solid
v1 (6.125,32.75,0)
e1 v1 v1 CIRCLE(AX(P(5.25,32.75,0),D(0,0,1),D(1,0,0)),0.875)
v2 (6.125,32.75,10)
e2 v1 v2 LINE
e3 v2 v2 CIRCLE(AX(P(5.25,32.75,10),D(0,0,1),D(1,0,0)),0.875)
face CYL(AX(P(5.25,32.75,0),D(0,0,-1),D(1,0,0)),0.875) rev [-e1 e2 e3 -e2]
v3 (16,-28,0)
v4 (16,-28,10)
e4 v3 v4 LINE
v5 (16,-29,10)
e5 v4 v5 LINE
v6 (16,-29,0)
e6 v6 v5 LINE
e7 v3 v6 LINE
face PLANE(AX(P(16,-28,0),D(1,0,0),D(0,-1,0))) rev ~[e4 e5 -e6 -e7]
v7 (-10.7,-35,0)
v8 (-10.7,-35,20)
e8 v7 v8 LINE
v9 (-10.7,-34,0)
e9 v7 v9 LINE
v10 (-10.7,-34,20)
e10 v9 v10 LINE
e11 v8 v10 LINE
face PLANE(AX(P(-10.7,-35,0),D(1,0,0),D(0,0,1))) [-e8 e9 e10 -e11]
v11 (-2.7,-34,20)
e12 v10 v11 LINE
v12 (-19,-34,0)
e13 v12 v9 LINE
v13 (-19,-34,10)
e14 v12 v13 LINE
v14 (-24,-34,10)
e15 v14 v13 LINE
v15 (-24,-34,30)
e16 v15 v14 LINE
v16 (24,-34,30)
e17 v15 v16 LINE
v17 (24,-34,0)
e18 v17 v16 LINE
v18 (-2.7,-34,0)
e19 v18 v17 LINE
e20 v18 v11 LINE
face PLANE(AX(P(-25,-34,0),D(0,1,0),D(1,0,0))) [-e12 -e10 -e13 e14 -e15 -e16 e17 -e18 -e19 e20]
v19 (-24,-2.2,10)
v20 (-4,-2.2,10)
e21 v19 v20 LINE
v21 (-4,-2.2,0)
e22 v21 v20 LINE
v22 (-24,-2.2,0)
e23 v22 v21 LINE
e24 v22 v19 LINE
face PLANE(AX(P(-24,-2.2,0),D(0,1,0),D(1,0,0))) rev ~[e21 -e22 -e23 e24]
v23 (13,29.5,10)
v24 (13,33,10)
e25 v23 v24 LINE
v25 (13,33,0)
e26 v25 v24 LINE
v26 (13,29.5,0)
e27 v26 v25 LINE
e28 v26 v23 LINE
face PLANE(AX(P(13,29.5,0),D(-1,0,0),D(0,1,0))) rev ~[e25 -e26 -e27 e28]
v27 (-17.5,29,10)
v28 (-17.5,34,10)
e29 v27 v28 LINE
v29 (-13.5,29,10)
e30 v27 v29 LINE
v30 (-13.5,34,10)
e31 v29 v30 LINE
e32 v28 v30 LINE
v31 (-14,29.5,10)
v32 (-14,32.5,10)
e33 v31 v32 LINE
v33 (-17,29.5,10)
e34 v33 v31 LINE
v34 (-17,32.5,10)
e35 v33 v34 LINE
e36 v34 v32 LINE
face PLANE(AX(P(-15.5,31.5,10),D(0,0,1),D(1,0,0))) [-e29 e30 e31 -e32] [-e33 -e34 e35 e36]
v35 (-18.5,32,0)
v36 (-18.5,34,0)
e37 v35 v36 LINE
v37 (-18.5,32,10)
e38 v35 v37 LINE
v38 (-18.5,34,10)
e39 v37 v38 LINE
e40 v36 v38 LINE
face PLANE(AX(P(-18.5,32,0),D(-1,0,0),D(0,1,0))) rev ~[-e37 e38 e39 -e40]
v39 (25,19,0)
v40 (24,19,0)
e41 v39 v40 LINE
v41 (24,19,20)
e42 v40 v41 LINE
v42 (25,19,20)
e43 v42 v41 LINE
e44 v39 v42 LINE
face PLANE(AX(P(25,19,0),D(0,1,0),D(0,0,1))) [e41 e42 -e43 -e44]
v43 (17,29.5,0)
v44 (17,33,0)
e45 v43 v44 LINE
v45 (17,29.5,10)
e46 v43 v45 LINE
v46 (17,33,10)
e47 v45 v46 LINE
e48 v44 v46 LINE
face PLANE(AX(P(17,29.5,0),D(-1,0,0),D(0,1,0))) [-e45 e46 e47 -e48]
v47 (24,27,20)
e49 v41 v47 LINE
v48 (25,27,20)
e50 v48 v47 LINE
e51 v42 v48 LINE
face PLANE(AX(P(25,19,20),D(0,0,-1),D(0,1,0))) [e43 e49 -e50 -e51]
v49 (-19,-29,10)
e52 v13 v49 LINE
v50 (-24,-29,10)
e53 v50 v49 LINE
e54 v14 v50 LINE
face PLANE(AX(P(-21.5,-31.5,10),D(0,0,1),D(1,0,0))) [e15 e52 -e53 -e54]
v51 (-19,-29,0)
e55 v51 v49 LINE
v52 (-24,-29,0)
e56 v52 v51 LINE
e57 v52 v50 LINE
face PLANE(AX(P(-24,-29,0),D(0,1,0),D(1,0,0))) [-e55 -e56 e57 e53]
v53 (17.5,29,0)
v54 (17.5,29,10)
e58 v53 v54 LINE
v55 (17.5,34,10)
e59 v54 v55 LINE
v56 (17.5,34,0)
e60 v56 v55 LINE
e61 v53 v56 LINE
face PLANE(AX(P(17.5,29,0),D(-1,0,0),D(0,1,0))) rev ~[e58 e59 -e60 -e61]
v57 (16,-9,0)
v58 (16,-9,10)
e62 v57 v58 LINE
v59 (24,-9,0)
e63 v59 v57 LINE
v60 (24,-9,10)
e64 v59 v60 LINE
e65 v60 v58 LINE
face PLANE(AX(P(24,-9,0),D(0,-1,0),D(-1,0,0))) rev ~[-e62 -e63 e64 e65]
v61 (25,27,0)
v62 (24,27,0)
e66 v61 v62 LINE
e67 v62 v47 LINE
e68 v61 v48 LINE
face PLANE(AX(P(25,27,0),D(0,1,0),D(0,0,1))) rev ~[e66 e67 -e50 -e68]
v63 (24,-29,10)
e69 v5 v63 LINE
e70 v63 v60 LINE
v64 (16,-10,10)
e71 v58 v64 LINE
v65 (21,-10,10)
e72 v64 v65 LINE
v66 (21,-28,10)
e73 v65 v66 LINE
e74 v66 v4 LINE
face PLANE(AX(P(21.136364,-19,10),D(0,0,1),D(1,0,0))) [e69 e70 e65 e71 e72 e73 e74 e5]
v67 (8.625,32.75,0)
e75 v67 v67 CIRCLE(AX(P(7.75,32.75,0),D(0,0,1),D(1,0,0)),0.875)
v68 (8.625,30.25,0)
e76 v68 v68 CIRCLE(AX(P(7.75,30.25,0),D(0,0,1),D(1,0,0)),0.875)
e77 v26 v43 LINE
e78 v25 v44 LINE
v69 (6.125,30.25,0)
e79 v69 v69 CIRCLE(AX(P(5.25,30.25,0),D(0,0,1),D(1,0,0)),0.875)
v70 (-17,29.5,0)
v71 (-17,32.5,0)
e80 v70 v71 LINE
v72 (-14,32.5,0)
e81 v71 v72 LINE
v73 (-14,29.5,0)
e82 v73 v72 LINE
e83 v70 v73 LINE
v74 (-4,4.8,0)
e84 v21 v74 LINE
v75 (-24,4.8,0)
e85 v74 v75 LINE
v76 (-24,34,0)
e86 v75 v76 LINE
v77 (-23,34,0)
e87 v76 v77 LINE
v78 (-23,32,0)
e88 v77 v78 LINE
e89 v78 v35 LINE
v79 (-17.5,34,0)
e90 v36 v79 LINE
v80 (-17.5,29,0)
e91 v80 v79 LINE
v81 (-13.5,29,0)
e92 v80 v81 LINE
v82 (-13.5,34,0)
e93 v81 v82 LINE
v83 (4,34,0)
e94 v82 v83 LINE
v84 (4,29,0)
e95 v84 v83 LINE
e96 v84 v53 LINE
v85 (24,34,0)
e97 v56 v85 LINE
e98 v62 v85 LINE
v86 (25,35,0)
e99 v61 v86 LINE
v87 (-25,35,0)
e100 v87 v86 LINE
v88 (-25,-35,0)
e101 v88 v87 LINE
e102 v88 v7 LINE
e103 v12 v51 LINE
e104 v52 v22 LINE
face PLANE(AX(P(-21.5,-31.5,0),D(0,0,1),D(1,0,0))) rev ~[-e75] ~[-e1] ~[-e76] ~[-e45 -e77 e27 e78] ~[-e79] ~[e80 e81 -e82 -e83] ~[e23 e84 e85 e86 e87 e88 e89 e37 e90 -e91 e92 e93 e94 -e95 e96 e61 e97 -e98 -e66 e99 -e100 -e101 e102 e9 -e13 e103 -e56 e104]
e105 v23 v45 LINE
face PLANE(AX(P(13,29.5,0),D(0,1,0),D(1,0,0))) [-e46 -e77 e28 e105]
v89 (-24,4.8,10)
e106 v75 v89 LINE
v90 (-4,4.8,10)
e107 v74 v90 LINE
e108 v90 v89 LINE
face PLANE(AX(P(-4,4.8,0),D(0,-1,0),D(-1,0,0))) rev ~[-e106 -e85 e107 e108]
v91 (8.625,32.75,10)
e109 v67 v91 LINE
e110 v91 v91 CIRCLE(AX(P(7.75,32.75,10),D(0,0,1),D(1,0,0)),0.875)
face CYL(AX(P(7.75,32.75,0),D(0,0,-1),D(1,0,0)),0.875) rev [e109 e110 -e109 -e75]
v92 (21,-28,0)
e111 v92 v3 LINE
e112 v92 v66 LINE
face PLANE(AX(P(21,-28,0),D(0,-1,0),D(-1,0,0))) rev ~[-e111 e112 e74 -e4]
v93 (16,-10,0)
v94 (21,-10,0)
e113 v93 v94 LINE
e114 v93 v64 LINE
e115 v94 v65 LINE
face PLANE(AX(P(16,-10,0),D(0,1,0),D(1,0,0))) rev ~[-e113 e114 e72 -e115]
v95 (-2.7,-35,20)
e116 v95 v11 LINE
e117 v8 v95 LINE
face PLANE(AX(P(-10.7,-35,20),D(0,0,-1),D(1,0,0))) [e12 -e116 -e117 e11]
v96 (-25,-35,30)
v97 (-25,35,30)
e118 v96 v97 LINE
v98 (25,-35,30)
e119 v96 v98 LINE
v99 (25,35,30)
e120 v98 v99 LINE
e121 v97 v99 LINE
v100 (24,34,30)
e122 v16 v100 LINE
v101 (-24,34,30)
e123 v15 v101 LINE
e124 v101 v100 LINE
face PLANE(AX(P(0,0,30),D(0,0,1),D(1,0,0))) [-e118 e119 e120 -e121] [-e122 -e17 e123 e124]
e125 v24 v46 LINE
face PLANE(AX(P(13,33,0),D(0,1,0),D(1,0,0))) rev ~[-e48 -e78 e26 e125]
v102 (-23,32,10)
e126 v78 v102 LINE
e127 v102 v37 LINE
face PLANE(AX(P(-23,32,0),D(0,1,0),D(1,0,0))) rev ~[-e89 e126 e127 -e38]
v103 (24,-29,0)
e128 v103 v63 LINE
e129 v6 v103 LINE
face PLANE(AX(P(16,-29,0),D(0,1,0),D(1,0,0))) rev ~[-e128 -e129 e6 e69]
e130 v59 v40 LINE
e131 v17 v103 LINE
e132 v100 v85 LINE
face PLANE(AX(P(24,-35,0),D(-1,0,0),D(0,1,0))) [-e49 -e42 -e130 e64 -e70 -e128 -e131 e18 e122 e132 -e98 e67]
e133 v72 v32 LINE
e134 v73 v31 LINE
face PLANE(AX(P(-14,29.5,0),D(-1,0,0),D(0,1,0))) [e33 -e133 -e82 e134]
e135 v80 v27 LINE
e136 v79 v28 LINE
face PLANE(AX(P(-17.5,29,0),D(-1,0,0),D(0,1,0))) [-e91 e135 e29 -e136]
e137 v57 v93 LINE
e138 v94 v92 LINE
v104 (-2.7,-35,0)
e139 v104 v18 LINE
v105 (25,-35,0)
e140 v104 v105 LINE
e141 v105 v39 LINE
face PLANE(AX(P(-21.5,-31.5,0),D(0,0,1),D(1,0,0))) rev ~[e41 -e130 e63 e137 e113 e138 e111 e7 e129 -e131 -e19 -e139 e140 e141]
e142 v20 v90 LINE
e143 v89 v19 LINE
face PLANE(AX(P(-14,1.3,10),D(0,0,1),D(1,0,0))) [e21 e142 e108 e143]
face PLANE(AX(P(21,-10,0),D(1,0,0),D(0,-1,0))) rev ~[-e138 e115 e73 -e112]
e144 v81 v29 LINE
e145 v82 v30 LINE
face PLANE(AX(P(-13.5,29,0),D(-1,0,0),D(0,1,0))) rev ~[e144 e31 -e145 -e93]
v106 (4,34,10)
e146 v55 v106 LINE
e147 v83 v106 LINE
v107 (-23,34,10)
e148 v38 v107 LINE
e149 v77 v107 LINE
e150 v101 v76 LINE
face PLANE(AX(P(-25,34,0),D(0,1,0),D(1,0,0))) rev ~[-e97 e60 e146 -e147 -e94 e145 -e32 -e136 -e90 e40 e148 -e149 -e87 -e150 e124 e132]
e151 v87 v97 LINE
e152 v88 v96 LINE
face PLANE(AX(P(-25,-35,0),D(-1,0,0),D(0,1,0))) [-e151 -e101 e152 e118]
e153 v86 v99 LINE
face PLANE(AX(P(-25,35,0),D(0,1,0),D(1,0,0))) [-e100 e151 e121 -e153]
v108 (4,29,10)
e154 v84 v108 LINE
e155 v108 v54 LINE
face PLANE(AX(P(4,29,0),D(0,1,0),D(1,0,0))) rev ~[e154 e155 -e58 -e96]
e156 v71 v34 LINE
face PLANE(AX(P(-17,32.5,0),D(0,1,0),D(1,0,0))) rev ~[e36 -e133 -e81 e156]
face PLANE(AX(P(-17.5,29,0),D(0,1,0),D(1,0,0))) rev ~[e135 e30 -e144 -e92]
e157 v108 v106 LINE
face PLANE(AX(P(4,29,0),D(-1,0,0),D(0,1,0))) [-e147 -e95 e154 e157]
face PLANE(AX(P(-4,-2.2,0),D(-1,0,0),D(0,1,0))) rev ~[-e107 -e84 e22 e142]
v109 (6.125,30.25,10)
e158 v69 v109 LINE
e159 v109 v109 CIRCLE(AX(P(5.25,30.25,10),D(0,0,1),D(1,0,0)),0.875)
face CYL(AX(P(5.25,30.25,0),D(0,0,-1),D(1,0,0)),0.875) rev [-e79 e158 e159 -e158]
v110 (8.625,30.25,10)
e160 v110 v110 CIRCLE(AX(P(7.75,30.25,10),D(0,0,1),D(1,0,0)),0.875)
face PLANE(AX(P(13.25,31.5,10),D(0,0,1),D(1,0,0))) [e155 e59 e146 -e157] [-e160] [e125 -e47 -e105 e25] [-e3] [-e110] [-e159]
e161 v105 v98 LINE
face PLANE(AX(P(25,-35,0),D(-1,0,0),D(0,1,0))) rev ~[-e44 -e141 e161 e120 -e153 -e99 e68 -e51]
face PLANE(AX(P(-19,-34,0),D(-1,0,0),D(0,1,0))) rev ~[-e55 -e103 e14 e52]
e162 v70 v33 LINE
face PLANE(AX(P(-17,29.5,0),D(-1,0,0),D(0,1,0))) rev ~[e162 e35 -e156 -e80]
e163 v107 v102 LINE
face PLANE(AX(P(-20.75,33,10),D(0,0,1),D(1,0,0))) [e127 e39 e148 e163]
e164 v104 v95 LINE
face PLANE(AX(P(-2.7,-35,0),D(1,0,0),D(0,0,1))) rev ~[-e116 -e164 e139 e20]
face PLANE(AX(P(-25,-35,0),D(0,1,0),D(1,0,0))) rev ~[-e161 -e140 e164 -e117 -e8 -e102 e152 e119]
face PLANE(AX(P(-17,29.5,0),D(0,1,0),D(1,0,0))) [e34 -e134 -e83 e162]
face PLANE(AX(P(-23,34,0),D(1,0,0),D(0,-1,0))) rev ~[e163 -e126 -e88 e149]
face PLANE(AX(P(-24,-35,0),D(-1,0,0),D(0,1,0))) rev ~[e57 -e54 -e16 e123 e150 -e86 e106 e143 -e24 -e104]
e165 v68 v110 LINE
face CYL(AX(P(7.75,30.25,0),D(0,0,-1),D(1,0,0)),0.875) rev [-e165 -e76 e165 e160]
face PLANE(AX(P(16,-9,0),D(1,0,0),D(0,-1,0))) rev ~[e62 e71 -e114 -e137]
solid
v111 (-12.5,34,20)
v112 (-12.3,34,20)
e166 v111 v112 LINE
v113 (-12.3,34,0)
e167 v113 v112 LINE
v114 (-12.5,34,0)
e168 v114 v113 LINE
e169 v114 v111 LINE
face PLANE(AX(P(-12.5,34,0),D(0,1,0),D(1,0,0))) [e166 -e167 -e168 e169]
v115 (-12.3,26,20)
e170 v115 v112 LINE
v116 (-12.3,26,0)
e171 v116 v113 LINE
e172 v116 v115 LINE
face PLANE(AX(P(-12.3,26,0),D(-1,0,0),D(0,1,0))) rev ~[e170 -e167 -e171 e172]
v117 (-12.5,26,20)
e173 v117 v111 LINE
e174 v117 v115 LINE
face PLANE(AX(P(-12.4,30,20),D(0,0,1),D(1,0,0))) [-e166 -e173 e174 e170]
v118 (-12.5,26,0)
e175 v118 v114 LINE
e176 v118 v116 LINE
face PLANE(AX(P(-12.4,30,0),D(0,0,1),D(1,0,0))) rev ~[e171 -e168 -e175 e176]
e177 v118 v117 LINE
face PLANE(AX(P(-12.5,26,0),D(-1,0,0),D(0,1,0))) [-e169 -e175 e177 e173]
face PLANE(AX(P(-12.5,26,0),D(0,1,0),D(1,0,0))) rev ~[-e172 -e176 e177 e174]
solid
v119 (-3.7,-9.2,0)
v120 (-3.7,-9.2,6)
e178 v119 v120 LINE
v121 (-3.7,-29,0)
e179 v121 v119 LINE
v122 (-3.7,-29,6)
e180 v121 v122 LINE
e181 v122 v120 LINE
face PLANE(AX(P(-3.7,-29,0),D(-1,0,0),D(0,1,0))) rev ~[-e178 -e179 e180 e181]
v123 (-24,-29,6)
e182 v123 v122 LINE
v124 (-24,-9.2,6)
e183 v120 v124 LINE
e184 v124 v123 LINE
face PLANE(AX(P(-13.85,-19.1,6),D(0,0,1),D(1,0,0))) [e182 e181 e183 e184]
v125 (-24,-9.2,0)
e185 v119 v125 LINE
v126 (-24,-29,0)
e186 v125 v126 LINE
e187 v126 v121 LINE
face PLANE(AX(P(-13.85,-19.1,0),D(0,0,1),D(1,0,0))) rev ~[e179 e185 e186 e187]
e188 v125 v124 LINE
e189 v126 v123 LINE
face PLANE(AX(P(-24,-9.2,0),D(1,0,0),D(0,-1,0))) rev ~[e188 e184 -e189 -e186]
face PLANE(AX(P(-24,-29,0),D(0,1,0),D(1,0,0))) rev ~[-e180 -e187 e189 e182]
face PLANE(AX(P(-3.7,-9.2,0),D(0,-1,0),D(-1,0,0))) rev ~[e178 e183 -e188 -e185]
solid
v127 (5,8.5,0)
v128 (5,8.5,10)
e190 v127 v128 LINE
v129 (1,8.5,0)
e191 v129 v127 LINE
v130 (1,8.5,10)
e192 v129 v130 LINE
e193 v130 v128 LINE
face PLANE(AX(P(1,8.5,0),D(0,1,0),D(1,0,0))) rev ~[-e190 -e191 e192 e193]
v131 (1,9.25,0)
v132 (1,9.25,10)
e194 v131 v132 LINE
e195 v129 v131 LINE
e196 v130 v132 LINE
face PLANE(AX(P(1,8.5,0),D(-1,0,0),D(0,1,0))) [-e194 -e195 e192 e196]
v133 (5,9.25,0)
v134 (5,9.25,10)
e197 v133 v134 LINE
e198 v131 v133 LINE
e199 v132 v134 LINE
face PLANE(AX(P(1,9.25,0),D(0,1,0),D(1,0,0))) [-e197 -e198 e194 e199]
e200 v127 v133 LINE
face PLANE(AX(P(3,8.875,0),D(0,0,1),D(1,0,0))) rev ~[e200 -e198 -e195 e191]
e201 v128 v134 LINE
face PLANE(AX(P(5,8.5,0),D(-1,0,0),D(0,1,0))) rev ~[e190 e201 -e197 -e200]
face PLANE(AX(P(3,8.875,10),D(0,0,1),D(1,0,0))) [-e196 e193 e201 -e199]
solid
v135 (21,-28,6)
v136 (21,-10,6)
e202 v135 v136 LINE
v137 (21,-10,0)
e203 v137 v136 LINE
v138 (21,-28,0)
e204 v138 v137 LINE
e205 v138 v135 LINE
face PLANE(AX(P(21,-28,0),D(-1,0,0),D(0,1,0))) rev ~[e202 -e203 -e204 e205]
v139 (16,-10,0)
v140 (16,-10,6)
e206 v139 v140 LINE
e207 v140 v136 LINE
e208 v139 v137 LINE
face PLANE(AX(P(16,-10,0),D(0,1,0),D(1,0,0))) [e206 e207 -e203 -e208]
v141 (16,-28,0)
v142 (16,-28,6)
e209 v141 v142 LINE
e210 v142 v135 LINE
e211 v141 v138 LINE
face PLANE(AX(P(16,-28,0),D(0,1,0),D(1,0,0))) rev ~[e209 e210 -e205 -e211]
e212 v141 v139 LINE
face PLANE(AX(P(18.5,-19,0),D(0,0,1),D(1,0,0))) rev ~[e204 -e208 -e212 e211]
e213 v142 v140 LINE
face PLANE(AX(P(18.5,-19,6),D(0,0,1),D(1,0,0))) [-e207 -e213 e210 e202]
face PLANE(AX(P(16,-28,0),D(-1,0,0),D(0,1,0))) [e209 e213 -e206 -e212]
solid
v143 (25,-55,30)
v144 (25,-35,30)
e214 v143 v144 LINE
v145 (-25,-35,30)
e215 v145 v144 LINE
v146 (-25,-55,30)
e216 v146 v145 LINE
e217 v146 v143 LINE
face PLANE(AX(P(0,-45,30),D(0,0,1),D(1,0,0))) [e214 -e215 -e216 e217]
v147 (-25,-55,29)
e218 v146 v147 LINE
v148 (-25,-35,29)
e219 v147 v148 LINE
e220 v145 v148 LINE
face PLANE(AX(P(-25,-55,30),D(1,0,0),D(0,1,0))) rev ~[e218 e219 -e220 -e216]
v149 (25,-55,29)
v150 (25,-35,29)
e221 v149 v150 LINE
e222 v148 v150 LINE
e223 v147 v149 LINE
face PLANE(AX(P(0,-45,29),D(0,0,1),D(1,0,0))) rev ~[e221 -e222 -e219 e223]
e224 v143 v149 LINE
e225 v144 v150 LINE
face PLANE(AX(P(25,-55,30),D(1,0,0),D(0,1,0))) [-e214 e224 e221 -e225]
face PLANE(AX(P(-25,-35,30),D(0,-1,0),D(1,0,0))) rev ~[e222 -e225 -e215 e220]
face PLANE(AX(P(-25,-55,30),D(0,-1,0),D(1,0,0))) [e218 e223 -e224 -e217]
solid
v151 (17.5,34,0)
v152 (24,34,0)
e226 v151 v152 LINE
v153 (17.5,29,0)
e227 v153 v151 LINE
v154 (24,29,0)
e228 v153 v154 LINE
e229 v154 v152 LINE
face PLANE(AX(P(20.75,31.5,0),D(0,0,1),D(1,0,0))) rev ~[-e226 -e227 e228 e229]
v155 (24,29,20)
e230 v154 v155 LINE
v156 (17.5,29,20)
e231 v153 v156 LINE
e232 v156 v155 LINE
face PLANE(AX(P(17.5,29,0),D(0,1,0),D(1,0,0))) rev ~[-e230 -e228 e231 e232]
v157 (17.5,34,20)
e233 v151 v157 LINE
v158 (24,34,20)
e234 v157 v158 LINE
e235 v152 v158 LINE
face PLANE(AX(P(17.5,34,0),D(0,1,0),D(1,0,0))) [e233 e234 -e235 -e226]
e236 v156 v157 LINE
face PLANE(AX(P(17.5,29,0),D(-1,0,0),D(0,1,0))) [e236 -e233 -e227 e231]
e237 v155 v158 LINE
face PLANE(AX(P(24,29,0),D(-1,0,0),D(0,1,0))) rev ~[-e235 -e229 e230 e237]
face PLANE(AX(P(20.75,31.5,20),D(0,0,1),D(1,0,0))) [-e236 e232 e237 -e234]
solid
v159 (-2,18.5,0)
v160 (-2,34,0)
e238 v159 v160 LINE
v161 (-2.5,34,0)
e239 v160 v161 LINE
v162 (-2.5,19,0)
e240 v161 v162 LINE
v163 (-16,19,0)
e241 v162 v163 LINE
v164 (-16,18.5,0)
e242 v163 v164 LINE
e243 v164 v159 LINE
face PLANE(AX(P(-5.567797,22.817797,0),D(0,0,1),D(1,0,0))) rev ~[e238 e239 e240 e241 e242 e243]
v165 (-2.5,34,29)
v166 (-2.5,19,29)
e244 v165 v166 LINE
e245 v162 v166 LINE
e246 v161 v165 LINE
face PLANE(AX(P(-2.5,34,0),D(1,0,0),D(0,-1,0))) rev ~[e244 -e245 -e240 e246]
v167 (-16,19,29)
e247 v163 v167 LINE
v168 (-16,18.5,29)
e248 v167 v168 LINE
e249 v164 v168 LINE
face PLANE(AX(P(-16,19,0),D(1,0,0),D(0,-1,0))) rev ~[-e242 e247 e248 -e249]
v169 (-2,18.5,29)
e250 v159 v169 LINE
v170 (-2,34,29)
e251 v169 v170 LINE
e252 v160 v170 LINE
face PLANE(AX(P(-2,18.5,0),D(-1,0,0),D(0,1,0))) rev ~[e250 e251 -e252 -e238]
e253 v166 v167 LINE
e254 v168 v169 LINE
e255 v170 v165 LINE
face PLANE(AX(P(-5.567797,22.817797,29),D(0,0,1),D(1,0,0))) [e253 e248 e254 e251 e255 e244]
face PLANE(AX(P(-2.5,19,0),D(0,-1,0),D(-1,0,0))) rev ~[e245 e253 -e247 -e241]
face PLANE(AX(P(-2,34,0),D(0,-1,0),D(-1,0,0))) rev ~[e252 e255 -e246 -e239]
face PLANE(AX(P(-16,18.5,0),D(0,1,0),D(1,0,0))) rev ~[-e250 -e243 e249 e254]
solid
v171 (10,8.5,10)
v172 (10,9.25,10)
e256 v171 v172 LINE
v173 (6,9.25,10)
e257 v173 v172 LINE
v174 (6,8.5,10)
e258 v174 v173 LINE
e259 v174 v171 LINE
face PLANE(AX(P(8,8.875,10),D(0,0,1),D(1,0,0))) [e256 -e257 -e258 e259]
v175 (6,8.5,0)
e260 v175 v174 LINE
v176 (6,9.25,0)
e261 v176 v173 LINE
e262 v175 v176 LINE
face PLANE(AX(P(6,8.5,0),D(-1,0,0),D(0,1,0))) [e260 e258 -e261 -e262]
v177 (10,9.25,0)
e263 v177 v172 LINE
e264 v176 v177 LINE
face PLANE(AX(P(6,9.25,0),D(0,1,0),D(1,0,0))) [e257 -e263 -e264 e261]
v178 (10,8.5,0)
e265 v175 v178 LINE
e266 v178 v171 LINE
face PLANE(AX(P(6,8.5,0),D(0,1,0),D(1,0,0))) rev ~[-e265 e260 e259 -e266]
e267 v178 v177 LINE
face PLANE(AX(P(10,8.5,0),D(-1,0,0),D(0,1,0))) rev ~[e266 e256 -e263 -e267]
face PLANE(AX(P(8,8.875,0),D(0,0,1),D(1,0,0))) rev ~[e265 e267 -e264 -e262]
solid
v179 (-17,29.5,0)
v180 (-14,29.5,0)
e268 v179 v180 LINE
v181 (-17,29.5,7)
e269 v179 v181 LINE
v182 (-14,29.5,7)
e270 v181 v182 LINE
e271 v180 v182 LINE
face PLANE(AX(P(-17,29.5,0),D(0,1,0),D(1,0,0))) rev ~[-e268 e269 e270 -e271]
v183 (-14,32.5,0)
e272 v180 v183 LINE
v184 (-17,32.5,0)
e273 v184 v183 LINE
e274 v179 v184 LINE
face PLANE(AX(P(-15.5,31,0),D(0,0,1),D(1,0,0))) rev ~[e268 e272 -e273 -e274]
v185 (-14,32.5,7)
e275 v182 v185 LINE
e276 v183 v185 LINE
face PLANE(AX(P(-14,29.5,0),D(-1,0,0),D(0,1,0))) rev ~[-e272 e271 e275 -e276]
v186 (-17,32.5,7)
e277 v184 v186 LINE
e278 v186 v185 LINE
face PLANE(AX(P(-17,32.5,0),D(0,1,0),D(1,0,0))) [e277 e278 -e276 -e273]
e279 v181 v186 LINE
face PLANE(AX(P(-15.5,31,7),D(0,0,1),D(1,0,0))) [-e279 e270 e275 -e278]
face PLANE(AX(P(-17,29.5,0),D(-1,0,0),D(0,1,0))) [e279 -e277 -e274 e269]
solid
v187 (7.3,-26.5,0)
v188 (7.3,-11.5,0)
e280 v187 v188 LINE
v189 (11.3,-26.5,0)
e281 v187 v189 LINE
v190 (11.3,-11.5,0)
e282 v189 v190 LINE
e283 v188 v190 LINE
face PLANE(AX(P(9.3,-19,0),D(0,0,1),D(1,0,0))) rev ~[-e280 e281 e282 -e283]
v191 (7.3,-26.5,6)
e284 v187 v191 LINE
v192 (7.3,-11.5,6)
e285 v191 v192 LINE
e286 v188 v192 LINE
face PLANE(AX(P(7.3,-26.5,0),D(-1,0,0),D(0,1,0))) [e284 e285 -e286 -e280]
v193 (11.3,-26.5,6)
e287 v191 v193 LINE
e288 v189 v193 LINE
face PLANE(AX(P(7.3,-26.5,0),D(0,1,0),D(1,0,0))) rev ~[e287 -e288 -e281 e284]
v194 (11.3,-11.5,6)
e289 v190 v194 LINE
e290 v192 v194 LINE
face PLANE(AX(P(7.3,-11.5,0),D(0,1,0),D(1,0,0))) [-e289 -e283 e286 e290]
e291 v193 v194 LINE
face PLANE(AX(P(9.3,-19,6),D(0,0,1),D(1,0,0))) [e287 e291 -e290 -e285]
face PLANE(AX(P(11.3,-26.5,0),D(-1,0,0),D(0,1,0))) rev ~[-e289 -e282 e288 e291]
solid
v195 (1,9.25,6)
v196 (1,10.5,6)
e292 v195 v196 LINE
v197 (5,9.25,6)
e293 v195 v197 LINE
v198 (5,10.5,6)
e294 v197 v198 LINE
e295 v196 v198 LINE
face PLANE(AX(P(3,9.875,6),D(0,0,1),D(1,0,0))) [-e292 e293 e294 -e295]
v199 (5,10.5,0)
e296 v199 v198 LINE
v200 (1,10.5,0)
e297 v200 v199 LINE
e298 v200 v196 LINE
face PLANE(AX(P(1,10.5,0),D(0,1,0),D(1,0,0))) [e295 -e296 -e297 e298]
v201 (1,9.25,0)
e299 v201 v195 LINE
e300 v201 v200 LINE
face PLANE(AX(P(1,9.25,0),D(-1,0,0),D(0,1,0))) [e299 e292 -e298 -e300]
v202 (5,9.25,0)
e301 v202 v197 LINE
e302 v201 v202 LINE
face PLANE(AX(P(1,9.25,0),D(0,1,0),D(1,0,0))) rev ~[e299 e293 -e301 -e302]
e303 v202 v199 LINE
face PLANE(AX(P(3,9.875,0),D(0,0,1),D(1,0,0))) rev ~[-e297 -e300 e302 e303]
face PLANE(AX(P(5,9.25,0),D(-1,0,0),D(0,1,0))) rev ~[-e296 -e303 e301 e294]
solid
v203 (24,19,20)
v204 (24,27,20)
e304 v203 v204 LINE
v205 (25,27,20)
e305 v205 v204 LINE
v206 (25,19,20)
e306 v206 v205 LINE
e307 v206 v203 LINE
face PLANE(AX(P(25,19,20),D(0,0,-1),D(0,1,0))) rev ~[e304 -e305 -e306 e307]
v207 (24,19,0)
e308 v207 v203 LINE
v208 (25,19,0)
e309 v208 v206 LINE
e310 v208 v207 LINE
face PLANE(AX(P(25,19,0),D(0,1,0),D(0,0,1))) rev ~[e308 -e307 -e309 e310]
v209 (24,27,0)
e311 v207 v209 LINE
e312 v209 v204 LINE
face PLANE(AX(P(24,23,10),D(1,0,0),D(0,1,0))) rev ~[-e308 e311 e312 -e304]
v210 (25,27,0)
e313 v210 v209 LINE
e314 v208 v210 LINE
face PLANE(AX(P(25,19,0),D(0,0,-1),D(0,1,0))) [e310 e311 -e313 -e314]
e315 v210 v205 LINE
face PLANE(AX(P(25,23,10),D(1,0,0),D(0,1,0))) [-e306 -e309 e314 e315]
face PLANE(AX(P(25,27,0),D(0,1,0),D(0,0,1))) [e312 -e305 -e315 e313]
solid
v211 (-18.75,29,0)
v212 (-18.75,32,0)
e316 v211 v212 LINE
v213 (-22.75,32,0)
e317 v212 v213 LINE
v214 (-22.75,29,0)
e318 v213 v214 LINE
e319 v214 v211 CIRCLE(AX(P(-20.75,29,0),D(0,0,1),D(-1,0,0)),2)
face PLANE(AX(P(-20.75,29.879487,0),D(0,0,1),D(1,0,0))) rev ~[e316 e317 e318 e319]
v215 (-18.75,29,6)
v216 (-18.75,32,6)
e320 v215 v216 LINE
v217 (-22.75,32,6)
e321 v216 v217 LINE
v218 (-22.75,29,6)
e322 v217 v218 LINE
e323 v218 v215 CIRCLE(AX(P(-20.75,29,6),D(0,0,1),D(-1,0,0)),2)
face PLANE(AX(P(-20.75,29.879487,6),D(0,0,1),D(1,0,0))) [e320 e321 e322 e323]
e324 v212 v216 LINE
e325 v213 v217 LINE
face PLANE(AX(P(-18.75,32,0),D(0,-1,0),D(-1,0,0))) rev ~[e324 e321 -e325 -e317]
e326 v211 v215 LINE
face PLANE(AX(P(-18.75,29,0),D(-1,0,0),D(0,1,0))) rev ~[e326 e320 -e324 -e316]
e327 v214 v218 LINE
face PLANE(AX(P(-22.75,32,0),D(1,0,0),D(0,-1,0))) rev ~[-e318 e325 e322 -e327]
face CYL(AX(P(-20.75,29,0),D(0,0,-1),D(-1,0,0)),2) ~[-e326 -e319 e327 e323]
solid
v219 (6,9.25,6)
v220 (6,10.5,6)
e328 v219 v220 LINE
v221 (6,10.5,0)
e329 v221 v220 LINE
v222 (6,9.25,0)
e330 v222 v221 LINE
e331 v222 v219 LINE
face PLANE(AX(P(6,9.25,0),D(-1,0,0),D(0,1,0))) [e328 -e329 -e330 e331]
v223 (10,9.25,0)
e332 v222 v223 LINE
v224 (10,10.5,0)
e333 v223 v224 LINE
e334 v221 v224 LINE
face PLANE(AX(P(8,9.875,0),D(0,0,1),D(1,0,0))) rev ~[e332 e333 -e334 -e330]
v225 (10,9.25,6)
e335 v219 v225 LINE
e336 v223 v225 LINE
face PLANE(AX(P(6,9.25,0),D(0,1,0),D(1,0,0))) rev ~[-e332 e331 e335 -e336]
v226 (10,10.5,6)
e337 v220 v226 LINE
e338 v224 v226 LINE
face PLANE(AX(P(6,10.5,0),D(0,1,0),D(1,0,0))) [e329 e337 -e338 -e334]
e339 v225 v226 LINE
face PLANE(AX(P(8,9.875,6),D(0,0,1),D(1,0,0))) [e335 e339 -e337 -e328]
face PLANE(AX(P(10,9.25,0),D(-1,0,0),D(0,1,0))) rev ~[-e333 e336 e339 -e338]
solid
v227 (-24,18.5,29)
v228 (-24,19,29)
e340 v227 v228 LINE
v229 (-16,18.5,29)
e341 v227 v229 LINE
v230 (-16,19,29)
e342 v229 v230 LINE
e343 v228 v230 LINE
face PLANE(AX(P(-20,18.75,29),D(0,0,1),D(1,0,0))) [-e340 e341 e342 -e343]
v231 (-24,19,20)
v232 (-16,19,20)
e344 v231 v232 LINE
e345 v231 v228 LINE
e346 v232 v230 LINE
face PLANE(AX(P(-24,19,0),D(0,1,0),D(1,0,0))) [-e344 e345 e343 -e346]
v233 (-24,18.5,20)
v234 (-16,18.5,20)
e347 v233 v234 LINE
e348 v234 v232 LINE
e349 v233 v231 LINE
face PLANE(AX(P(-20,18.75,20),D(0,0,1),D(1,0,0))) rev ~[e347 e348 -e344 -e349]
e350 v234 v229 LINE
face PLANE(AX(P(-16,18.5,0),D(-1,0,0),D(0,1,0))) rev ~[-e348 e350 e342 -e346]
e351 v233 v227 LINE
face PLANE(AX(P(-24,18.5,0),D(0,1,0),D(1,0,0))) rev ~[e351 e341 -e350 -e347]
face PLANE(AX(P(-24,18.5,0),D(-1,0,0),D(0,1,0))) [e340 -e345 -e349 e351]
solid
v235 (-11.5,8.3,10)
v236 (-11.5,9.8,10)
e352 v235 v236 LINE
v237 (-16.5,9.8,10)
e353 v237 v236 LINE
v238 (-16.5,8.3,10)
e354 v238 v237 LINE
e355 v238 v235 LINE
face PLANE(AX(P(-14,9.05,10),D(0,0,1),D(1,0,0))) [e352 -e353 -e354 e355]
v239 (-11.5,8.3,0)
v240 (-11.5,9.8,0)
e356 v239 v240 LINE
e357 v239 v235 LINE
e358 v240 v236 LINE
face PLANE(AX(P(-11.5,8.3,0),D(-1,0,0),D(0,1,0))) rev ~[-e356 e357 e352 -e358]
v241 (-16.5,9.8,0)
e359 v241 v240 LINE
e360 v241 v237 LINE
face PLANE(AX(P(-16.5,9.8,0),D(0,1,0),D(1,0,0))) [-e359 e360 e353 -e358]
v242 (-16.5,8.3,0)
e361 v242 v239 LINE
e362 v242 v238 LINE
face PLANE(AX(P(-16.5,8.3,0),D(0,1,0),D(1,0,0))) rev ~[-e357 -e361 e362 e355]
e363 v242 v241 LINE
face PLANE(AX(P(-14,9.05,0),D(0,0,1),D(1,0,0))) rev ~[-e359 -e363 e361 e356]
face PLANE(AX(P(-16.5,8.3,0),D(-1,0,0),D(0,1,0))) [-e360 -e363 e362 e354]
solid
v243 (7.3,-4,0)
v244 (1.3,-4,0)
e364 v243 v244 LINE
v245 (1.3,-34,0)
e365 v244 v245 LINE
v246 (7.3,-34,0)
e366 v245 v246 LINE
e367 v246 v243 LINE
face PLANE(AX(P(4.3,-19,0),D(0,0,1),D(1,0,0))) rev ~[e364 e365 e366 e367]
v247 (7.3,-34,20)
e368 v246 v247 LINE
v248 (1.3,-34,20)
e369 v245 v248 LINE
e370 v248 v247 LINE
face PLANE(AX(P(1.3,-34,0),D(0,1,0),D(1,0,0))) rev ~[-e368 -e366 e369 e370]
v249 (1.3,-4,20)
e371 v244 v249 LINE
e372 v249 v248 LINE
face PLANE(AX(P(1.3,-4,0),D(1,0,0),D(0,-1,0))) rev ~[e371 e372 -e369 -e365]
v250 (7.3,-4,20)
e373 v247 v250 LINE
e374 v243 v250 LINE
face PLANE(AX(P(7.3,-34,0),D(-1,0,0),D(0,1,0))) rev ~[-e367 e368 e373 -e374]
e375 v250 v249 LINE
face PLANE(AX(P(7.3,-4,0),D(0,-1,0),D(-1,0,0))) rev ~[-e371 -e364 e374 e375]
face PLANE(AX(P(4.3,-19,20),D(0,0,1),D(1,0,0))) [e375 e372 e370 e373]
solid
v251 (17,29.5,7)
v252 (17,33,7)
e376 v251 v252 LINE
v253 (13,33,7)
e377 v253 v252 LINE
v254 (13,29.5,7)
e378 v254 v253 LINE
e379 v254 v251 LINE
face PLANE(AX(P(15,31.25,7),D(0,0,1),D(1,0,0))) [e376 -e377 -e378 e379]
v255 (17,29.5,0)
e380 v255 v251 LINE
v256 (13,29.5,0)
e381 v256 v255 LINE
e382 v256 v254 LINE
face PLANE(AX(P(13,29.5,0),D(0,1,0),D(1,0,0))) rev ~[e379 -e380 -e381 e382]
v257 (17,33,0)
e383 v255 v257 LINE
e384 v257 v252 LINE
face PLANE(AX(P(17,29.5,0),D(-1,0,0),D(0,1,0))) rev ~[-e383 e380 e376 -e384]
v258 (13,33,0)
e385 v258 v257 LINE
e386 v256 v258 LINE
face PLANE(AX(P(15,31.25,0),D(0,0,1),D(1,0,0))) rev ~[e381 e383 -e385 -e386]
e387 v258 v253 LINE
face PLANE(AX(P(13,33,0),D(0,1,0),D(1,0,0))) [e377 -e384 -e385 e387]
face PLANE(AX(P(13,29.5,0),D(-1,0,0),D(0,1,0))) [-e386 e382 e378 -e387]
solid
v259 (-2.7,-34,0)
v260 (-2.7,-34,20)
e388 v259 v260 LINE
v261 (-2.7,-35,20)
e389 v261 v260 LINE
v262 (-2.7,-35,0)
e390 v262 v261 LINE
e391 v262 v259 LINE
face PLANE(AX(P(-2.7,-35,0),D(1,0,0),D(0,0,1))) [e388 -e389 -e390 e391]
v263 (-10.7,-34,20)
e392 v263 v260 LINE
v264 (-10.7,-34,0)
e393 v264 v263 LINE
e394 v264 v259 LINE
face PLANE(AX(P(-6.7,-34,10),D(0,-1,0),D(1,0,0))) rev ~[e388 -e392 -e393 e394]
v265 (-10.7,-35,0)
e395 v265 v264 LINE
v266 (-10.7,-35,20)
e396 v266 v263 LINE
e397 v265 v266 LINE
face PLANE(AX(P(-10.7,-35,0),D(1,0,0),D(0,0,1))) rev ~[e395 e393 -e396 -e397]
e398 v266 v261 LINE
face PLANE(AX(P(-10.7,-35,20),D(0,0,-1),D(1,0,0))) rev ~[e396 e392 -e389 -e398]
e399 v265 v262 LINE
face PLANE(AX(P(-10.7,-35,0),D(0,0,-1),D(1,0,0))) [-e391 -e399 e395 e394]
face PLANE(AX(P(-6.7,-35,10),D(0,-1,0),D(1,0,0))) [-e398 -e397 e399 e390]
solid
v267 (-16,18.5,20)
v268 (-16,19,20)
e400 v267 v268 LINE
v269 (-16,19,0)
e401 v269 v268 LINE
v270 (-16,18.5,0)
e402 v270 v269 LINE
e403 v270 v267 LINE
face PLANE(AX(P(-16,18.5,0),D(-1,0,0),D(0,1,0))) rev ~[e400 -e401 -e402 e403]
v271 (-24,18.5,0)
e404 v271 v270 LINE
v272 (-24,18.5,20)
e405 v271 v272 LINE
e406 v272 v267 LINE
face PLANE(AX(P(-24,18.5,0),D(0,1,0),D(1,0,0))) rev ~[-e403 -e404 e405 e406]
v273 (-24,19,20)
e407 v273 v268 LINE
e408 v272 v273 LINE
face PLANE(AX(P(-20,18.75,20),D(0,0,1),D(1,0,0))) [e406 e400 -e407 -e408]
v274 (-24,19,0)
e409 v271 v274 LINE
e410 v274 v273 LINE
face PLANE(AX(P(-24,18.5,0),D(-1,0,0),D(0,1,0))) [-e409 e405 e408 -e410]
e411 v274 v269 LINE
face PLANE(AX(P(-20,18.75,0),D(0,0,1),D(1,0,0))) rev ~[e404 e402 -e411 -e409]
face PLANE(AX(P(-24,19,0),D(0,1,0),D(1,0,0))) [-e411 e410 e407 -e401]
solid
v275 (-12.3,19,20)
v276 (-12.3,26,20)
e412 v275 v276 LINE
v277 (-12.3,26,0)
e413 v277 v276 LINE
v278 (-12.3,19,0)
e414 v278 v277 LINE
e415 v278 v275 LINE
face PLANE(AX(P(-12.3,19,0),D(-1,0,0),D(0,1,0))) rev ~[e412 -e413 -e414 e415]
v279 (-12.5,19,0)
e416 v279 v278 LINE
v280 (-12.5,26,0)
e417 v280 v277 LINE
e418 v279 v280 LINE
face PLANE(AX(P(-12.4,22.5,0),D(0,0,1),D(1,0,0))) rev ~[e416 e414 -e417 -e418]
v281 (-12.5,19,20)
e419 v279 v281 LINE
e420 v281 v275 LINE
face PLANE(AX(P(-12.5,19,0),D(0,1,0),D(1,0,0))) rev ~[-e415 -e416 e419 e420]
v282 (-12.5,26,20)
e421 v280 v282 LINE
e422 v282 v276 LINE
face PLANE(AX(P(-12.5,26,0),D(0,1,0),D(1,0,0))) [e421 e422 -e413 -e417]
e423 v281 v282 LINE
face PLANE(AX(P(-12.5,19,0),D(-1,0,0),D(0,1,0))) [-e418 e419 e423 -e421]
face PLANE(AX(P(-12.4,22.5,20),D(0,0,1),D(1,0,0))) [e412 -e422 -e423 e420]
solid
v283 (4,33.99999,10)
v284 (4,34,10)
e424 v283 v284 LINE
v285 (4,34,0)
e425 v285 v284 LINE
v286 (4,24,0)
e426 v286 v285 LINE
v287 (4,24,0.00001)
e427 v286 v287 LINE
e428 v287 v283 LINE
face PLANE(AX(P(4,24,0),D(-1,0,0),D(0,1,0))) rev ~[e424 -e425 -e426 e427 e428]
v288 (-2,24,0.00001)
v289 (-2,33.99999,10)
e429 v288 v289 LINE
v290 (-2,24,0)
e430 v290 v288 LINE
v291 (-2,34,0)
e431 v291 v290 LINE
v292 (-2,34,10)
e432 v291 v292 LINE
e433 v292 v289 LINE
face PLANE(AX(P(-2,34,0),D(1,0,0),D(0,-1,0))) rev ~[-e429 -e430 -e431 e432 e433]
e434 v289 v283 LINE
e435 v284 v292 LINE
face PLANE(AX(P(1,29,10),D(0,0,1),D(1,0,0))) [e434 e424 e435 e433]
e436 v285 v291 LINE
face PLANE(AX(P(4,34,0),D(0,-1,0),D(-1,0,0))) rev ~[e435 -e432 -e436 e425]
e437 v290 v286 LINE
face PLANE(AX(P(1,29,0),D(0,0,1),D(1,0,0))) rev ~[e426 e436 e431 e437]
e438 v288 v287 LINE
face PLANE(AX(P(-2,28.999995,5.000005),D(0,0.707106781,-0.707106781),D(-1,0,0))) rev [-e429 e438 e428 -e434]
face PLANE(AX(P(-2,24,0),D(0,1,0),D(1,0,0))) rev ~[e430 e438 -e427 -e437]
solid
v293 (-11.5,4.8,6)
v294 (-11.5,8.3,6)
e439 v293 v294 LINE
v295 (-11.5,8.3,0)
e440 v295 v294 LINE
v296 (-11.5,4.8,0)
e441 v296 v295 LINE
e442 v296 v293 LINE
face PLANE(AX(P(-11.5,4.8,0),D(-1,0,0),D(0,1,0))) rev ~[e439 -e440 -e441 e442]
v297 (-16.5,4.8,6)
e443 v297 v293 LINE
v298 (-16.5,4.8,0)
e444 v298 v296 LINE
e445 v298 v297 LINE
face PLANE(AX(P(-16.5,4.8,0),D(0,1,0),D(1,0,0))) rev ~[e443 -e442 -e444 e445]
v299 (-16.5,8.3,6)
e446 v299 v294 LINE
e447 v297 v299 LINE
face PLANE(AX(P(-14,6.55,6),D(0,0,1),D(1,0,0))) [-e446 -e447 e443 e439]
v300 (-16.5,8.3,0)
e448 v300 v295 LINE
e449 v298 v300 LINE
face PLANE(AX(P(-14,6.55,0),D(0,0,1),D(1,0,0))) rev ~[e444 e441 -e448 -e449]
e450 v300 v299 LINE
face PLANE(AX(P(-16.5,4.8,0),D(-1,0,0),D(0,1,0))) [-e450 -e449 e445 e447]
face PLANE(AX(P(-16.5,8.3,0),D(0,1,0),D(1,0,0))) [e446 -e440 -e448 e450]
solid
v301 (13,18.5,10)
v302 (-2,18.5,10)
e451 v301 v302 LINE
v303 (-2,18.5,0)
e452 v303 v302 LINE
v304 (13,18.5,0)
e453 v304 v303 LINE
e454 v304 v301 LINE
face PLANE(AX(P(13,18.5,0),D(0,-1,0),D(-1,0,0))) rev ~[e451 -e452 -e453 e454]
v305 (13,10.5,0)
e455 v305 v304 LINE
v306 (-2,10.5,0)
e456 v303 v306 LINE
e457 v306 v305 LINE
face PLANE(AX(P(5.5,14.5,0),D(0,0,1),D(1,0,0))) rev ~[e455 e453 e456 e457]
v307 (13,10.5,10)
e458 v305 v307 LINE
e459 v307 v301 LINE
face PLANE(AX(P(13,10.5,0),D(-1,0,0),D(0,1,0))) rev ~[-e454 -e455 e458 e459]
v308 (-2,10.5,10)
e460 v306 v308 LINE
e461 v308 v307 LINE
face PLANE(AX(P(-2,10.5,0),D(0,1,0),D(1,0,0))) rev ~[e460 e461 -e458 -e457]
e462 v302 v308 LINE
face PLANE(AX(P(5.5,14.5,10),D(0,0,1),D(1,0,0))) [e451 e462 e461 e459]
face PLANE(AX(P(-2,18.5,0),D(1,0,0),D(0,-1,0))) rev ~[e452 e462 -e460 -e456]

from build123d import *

# Parameters (mm, degrees)
F0_W      = 50
F0_H      = 70
F1_DEPTH  = 30
F2_T      = -1
F4_DEPTH  = 10
F3_W      = 4
F3_H      = 0.75
F3_W_2    = 5
F3_H_2    = 1.5
F3_H_3    = 5
F3_W_3    = 3
F3_H_4    = 3
F3_W_4    = 8.5
F3_H_5    = 3.5
F3_R      = 0.875
F5_DEPTH  = 6
F3_H_6    = 1.25
F3_H_7    = 18
F3_H_8    = 15
F6_DEPTH  = 20
F3_W_5    = 6.5
F3_W_6    = 0.2
F3_H_9    = 7
F3_H_10   = 8
F7_DEPTH  = 20
F8_DEPTH  = 10
F9_SIZE   = 9.99999
F10_DEPTH = 7
F12_DEPTH = 29
F3_W_7    = 8
F3_H_11   = 0.5
F13_DEPTH = 29
F14_DEPTH = 20
F15_DEPTH = 20
F16_W     = 50
F16_H     = 20
F17_DEPTH = 1
F18_W     = 8
F18_H     = 20
F19_DEPTH = 1
F20_DEPTH = 1
F21_W     = 8
F21_H     = 20
F22_DEPTH = 1
F23_DEPTH = 1


# Not quite as in the source:
# - a fillet or chamfer is up to 0.001 mm smaller than in the source, because OpenCascade refuses the exact size
# - the program builds the solid bodies; features that only make, move or delete a surface that nothing else refers to are left out


with BuildPart() as f1:
    # F0 (on Top) → F1 (new body)
    with BuildSketch(Plane.XY):
        Rectangle(F0_W, F0_H)
    extrude(amount=F1_DEPTH)

    # F2
    f2_openings = [f1.faces().sort_by_distance(p)[0] for p in [
        (0, 0, 30),
        (0, 0, 0),
    ]]
    offset(amount=F2_T, openings=f2_openings)

    # F3 (on Top) → F4, piece 5 (join)
    with BuildSketch(Plane.XY):
        with Locations((-15.5, 31.5)):
            Rectangle(F3_W, F3_H_3)
        with Locations((-15.5, 31)):
            Rectangle(F3_W_3, F3_H_4, mode=Mode.SUBTRACT)
        Polygon((-23, 34), (-23, 32), (-22.75, 32), (-18.75, 32), (-18.5, 32), (-18.5, 34), align=None)
        Polygon((-16.5, 4.8), (-24, 4.8), (-24, -2.2), (-4, -2.2), (-4, 4.8), (-11.5, 4.8), align=None)
        with Locations((13.25, 31.5)):
            Rectangle(F3_W_4, F3_H_3)
        with Locations((15, 31.25)):
            Rectangle(F3_W, F3_H_5, mode=Mode.SUBTRACT)
        with Locations((-21.5, -31.5)):
            Rectangle(F3_W_2, F3_H_3)
        Polygon((24, -9), (16, -9), (16, -10), (21, -10), (21, -28), (16, -28), (16, -29), (24, -29), align=None)
        with Locations((6.5, 31.5)):
            Rectangle(F3_W_2, F3_H_3)
        with Locations((5.25, 30.25)):
            Circle(F3_R, mode=Mode.SUBTRACT)
        with Locations((5.25, 32.75)):
            Circle(F3_R, mode=Mode.SUBTRACT)
        with Locations((7.75, 30.25)):
            Circle(F3_R, mode=Mode.SUBTRACT)
        with Locations((7.75, 32.75)):
            Circle(F3_R, mode=Mode.SUBTRACT)
    extrude(amount=F4_DEPTH)

    # F18 (on face) → F19 (cut)
    with BuildSketch(Plane.YZ.offset(25)):
        with Locations((23, 10)):
            Rectangle(F18_W, F18_H)
    extrude(amount=-F19_DEPTH, mode=Mode.SUBTRACT)

    # F21 (on face) → F22 (cut)
    with BuildSketch(Plane.XZ.offset(35)):
        with Locations((-6.7, 10)):
            Rectangle(F21_W, F21_H)
    extrude(amount=-F22_DEPTH, mode=Mode.SUBTRACT)


with BuildPart() as f4:
    # F3 (on Top) → F4 (new body)
    with BuildSketch(Plane.XY):
        Polygon((13, 18.5), (-2, 18.5), (-2, 10.5), (1, 10.5), (5, 10.5), (6, 10.5), (10, 10.5), (13, 10.5), align=None)
    extrude(amount=F4_DEPTH)


with BuildPart() as f4b:
    # F3 (on Top) → F4, piece 2 (new body)
    with BuildSketch(Plane.XY):
        with Locations((3, 8.875)):
            Rectangle(F3_W, F3_H)
    extrude(amount=F4_DEPTH)


with BuildPart() as f4c:
    # F3 (on Top) → F4, piece 3 (new body)
    with BuildSketch(Plane.XY):
        with Locations((8, 8.875)):
            Rectangle(F3_W, F3_H)
    extrude(amount=F4_DEPTH)


with BuildPart() as f4d:
    # F3 (on Top) → F4, piece 4 (new body)
    with BuildSketch(Plane.XY):
        with Locations((-14, 9.05)):
            Rectangle(F3_W_2, F3_H_2)
    extrude(amount=F4_DEPTH)


with BuildPart() as f5:
    # F3 (on Top) → F5 (new body)
    with BuildSketch(Plane.XY):
        with Locations((-14, 6.55)):
            Rectangle(F3_W_2, F3_H_5)
    extrude(amount=F5_DEPTH)


with BuildPart() as f5b:
    # F3 (on Top) → F5, piece 2 (new body)
    with BuildSketch(Plane.XY):
        with Locations((3, 9.875)):
            Rectangle(F3_W, F3_H_6)
    extrude(amount=F5_DEPTH)


with BuildPart() as f5c:
    # F3 (on Top) → F5, piece 3 (new body)
    with BuildSketch(Plane.XY):
        with Locations((8, 9.875)):
            Rectangle(F3_W, F3_H_6)
    extrude(amount=F5_DEPTH)


with BuildPart() as f5d:
    # F3 (on Top) → F5, piece 4 (new body)
    with BuildSketch(Plane.XY):
        with Locations((18.5, -19)):
            Rectangle(F3_W_2, F3_H_7)
    extrude(amount=F5_DEPTH)


with BuildPart() as f5e:
    # F3 (on Top) → F5, piece 5 (new body)
    with BuildSketch(Plane.XY):
        with Locations((9.3, -19)):
            Rectangle(F3_W, F3_H_8)
    extrude(amount=F5_DEPTH)


with BuildPart() as f5f:
    # F3 (on Top) → F5, piece 6 (new body)
    with BuildSketch(Plane.XY):
        Polygon((-3.7, -9.2), (-24, -9.2), (-24, -29), (-19, -29), (-3.7, -29), align=None)
    extrude(amount=F5_DEPTH)


with BuildPart() as f5g:
    # F3 (on Top) → F5, piece 7 (new body)
    with BuildSketch(Plane.XY):
        with BuildLine():
            Line((-18.75, 32), (-22.75, 32))
            Line((-22.75, 32), (-22.75, 29))
            ThreePointArc((-22.75, 29), (-20.75, 27), (-18.75, 29))
            Line((-18.75, 29), (-18.75, 32))
        make_face()
    extrude(amount=F5_DEPTH)


with BuildPart() as f6:
    # F3 (on Top) → F6 (new body)
    with BuildSketch(Plane.XY):
        Polygon((7.3, -26.5), (7.3, -11.5), (7.3, -4), (1.3, -4), (1.3, -34), (7.3, -34), align=None)
    extrude(amount=F6_DEPTH)


with BuildPart() as f6b:
    # F3 (on Top) → F6, piece 2 (new body)
    with BuildSketch(Plane.XY):
        with Locations((20.75, 31.5)):
            Rectangle(F3_W_5, F3_H_3)
    extrude(amount=F6_DEPTH)


with BuildPart() as f6c:
    # F3 (on Top) → F6, piece 3 (new body)
    with BuildSketch(Plane.XY):
        with Locations((-12.4, 22.5)):
            Rectangle(F3_W_6, F3_H_9)
    extrude(amount=F6_DEPTH)


with BuildPart() as f7:
    # F3 (on Top) → F7 (new body)
    with BuildSketch(Plane.XY):
        with Locations((-12.4, 30)):
            Rectangle(F3_W_6, F3_H_10)
    extrude(amount=F7_DEPTH)


with BuildPart() as f8:
    # F3 (on Top) → F8 (new body)
    with BuildSketch(Plane.XY):
        Polygon((4, 29), (4, 34), (-2, 34), (-2, 24), (4, 24), align=None)
    extrude(amount=F8_DEPTH)

    # F9 (size 10 in the source; OpenCascade refuses exactly that, so slightly less here)
    f9_edges = [f8.edges().sort_by_distance(p)[0] for p in [
        (1, 24, 10),
    ]]
    chamfer(f9_edges, length=F9_SIZE)


with BuildPart() as f10:
    # F3 (on Top) → F10 (new body)
    with BuildSketch(Plane.XY):
        with Locations((-15.5, 31)):
            Rectangle(F3_W_3, F3_H_4)
    extrude(amount=F10_DEPTH)


with BuildPart() as f10b:
    # F3 (on Top) → F10, piece 2 (new body)
    with BuildSketch(Plane.XY):
        with Locations((15, 31.25)):
            Rectangle(F3_W, F3_H_5)
    extrude(amount=F10_DEPTH)


with BuildPart() as f12:
    # F3 (on Top) → F12 (new body)
    with BuildSketch(Plane.XY):
        Polygon((-2, 24), (-2, 34), (-2.5, 34), (-2.5, 19), (-12.3, 19), (-12.5, 19), (-16, 19), (-16, 18.5), (-2, 18.5), align=None)
    extrude(amount=F12_DEPTH)


with BuildPart() as f13:
    # F3 (on Top) → F13 (new body)
    with BuildSketch(Plane.XY):
        with Locations((-20, 18.75)):
            Rectangle(F3_W_7, F3_H_11)
    extrude(amount=F13_DEPTH)

    # F3 (on Top) → F14 (cut)
    with BuildSketch(Plane.XY):
        with Locations((-20, 18.75)):
            Rectangle(F3_W_7, F3_H_11)
    extrude(amount=F14_DEPTH, mode=Mode.SUBTRACT)


with BuildPart() as f15:
    # F3 (on Top) → F15 (new body)
    with BuildSketch(Plane.XY):
        with Locations((-20, 18.75)):
            Rectangle(F3_W_7, F3_H_11)
    extrude(amount=F15_DEPTH)


with BuildPart() as f17:
    # F16 (on face) → F17 (new body)
    with BuildSketch(Plane.XY.offset(30)):
        with Locations((0, -45)):
            Rectangle(F16_W, F16_H)
    extrude(amount=-F17_DEPTH)


with BuildPart() as f20:
    # F18 (on face) → F20 (new body)
    with BuildSketch(Plane.YZ.offset(25)):
        with Locations((23, 10)):
            Rectangle(F18_W, F18_H)
    extrude(amount=-F20_DEPTH)


with BuildPart() as f23:
    # F21 (on face) → F23 (new body)
    with BuildSketch(Plane.XZ.offset(35)):
        with Locations((-6.7, 10)):
            Rectangle(F21_W, F21_H)
    extrude(amount=-F23_DEPTH)


solid = Compound([f1.part, f4.part, f4b.part, f4c.part, f4d.part, f5.part, f5b.part, f5c.part, f5d.part, f5e.part, f5f.part, f5g.part, f6.part, f6b.part, f6c.part, f7.part, f8.part, f10.part, f10b.part, f12.part, f13.part, f15.part, f17.part, f20.part, f23.part])
